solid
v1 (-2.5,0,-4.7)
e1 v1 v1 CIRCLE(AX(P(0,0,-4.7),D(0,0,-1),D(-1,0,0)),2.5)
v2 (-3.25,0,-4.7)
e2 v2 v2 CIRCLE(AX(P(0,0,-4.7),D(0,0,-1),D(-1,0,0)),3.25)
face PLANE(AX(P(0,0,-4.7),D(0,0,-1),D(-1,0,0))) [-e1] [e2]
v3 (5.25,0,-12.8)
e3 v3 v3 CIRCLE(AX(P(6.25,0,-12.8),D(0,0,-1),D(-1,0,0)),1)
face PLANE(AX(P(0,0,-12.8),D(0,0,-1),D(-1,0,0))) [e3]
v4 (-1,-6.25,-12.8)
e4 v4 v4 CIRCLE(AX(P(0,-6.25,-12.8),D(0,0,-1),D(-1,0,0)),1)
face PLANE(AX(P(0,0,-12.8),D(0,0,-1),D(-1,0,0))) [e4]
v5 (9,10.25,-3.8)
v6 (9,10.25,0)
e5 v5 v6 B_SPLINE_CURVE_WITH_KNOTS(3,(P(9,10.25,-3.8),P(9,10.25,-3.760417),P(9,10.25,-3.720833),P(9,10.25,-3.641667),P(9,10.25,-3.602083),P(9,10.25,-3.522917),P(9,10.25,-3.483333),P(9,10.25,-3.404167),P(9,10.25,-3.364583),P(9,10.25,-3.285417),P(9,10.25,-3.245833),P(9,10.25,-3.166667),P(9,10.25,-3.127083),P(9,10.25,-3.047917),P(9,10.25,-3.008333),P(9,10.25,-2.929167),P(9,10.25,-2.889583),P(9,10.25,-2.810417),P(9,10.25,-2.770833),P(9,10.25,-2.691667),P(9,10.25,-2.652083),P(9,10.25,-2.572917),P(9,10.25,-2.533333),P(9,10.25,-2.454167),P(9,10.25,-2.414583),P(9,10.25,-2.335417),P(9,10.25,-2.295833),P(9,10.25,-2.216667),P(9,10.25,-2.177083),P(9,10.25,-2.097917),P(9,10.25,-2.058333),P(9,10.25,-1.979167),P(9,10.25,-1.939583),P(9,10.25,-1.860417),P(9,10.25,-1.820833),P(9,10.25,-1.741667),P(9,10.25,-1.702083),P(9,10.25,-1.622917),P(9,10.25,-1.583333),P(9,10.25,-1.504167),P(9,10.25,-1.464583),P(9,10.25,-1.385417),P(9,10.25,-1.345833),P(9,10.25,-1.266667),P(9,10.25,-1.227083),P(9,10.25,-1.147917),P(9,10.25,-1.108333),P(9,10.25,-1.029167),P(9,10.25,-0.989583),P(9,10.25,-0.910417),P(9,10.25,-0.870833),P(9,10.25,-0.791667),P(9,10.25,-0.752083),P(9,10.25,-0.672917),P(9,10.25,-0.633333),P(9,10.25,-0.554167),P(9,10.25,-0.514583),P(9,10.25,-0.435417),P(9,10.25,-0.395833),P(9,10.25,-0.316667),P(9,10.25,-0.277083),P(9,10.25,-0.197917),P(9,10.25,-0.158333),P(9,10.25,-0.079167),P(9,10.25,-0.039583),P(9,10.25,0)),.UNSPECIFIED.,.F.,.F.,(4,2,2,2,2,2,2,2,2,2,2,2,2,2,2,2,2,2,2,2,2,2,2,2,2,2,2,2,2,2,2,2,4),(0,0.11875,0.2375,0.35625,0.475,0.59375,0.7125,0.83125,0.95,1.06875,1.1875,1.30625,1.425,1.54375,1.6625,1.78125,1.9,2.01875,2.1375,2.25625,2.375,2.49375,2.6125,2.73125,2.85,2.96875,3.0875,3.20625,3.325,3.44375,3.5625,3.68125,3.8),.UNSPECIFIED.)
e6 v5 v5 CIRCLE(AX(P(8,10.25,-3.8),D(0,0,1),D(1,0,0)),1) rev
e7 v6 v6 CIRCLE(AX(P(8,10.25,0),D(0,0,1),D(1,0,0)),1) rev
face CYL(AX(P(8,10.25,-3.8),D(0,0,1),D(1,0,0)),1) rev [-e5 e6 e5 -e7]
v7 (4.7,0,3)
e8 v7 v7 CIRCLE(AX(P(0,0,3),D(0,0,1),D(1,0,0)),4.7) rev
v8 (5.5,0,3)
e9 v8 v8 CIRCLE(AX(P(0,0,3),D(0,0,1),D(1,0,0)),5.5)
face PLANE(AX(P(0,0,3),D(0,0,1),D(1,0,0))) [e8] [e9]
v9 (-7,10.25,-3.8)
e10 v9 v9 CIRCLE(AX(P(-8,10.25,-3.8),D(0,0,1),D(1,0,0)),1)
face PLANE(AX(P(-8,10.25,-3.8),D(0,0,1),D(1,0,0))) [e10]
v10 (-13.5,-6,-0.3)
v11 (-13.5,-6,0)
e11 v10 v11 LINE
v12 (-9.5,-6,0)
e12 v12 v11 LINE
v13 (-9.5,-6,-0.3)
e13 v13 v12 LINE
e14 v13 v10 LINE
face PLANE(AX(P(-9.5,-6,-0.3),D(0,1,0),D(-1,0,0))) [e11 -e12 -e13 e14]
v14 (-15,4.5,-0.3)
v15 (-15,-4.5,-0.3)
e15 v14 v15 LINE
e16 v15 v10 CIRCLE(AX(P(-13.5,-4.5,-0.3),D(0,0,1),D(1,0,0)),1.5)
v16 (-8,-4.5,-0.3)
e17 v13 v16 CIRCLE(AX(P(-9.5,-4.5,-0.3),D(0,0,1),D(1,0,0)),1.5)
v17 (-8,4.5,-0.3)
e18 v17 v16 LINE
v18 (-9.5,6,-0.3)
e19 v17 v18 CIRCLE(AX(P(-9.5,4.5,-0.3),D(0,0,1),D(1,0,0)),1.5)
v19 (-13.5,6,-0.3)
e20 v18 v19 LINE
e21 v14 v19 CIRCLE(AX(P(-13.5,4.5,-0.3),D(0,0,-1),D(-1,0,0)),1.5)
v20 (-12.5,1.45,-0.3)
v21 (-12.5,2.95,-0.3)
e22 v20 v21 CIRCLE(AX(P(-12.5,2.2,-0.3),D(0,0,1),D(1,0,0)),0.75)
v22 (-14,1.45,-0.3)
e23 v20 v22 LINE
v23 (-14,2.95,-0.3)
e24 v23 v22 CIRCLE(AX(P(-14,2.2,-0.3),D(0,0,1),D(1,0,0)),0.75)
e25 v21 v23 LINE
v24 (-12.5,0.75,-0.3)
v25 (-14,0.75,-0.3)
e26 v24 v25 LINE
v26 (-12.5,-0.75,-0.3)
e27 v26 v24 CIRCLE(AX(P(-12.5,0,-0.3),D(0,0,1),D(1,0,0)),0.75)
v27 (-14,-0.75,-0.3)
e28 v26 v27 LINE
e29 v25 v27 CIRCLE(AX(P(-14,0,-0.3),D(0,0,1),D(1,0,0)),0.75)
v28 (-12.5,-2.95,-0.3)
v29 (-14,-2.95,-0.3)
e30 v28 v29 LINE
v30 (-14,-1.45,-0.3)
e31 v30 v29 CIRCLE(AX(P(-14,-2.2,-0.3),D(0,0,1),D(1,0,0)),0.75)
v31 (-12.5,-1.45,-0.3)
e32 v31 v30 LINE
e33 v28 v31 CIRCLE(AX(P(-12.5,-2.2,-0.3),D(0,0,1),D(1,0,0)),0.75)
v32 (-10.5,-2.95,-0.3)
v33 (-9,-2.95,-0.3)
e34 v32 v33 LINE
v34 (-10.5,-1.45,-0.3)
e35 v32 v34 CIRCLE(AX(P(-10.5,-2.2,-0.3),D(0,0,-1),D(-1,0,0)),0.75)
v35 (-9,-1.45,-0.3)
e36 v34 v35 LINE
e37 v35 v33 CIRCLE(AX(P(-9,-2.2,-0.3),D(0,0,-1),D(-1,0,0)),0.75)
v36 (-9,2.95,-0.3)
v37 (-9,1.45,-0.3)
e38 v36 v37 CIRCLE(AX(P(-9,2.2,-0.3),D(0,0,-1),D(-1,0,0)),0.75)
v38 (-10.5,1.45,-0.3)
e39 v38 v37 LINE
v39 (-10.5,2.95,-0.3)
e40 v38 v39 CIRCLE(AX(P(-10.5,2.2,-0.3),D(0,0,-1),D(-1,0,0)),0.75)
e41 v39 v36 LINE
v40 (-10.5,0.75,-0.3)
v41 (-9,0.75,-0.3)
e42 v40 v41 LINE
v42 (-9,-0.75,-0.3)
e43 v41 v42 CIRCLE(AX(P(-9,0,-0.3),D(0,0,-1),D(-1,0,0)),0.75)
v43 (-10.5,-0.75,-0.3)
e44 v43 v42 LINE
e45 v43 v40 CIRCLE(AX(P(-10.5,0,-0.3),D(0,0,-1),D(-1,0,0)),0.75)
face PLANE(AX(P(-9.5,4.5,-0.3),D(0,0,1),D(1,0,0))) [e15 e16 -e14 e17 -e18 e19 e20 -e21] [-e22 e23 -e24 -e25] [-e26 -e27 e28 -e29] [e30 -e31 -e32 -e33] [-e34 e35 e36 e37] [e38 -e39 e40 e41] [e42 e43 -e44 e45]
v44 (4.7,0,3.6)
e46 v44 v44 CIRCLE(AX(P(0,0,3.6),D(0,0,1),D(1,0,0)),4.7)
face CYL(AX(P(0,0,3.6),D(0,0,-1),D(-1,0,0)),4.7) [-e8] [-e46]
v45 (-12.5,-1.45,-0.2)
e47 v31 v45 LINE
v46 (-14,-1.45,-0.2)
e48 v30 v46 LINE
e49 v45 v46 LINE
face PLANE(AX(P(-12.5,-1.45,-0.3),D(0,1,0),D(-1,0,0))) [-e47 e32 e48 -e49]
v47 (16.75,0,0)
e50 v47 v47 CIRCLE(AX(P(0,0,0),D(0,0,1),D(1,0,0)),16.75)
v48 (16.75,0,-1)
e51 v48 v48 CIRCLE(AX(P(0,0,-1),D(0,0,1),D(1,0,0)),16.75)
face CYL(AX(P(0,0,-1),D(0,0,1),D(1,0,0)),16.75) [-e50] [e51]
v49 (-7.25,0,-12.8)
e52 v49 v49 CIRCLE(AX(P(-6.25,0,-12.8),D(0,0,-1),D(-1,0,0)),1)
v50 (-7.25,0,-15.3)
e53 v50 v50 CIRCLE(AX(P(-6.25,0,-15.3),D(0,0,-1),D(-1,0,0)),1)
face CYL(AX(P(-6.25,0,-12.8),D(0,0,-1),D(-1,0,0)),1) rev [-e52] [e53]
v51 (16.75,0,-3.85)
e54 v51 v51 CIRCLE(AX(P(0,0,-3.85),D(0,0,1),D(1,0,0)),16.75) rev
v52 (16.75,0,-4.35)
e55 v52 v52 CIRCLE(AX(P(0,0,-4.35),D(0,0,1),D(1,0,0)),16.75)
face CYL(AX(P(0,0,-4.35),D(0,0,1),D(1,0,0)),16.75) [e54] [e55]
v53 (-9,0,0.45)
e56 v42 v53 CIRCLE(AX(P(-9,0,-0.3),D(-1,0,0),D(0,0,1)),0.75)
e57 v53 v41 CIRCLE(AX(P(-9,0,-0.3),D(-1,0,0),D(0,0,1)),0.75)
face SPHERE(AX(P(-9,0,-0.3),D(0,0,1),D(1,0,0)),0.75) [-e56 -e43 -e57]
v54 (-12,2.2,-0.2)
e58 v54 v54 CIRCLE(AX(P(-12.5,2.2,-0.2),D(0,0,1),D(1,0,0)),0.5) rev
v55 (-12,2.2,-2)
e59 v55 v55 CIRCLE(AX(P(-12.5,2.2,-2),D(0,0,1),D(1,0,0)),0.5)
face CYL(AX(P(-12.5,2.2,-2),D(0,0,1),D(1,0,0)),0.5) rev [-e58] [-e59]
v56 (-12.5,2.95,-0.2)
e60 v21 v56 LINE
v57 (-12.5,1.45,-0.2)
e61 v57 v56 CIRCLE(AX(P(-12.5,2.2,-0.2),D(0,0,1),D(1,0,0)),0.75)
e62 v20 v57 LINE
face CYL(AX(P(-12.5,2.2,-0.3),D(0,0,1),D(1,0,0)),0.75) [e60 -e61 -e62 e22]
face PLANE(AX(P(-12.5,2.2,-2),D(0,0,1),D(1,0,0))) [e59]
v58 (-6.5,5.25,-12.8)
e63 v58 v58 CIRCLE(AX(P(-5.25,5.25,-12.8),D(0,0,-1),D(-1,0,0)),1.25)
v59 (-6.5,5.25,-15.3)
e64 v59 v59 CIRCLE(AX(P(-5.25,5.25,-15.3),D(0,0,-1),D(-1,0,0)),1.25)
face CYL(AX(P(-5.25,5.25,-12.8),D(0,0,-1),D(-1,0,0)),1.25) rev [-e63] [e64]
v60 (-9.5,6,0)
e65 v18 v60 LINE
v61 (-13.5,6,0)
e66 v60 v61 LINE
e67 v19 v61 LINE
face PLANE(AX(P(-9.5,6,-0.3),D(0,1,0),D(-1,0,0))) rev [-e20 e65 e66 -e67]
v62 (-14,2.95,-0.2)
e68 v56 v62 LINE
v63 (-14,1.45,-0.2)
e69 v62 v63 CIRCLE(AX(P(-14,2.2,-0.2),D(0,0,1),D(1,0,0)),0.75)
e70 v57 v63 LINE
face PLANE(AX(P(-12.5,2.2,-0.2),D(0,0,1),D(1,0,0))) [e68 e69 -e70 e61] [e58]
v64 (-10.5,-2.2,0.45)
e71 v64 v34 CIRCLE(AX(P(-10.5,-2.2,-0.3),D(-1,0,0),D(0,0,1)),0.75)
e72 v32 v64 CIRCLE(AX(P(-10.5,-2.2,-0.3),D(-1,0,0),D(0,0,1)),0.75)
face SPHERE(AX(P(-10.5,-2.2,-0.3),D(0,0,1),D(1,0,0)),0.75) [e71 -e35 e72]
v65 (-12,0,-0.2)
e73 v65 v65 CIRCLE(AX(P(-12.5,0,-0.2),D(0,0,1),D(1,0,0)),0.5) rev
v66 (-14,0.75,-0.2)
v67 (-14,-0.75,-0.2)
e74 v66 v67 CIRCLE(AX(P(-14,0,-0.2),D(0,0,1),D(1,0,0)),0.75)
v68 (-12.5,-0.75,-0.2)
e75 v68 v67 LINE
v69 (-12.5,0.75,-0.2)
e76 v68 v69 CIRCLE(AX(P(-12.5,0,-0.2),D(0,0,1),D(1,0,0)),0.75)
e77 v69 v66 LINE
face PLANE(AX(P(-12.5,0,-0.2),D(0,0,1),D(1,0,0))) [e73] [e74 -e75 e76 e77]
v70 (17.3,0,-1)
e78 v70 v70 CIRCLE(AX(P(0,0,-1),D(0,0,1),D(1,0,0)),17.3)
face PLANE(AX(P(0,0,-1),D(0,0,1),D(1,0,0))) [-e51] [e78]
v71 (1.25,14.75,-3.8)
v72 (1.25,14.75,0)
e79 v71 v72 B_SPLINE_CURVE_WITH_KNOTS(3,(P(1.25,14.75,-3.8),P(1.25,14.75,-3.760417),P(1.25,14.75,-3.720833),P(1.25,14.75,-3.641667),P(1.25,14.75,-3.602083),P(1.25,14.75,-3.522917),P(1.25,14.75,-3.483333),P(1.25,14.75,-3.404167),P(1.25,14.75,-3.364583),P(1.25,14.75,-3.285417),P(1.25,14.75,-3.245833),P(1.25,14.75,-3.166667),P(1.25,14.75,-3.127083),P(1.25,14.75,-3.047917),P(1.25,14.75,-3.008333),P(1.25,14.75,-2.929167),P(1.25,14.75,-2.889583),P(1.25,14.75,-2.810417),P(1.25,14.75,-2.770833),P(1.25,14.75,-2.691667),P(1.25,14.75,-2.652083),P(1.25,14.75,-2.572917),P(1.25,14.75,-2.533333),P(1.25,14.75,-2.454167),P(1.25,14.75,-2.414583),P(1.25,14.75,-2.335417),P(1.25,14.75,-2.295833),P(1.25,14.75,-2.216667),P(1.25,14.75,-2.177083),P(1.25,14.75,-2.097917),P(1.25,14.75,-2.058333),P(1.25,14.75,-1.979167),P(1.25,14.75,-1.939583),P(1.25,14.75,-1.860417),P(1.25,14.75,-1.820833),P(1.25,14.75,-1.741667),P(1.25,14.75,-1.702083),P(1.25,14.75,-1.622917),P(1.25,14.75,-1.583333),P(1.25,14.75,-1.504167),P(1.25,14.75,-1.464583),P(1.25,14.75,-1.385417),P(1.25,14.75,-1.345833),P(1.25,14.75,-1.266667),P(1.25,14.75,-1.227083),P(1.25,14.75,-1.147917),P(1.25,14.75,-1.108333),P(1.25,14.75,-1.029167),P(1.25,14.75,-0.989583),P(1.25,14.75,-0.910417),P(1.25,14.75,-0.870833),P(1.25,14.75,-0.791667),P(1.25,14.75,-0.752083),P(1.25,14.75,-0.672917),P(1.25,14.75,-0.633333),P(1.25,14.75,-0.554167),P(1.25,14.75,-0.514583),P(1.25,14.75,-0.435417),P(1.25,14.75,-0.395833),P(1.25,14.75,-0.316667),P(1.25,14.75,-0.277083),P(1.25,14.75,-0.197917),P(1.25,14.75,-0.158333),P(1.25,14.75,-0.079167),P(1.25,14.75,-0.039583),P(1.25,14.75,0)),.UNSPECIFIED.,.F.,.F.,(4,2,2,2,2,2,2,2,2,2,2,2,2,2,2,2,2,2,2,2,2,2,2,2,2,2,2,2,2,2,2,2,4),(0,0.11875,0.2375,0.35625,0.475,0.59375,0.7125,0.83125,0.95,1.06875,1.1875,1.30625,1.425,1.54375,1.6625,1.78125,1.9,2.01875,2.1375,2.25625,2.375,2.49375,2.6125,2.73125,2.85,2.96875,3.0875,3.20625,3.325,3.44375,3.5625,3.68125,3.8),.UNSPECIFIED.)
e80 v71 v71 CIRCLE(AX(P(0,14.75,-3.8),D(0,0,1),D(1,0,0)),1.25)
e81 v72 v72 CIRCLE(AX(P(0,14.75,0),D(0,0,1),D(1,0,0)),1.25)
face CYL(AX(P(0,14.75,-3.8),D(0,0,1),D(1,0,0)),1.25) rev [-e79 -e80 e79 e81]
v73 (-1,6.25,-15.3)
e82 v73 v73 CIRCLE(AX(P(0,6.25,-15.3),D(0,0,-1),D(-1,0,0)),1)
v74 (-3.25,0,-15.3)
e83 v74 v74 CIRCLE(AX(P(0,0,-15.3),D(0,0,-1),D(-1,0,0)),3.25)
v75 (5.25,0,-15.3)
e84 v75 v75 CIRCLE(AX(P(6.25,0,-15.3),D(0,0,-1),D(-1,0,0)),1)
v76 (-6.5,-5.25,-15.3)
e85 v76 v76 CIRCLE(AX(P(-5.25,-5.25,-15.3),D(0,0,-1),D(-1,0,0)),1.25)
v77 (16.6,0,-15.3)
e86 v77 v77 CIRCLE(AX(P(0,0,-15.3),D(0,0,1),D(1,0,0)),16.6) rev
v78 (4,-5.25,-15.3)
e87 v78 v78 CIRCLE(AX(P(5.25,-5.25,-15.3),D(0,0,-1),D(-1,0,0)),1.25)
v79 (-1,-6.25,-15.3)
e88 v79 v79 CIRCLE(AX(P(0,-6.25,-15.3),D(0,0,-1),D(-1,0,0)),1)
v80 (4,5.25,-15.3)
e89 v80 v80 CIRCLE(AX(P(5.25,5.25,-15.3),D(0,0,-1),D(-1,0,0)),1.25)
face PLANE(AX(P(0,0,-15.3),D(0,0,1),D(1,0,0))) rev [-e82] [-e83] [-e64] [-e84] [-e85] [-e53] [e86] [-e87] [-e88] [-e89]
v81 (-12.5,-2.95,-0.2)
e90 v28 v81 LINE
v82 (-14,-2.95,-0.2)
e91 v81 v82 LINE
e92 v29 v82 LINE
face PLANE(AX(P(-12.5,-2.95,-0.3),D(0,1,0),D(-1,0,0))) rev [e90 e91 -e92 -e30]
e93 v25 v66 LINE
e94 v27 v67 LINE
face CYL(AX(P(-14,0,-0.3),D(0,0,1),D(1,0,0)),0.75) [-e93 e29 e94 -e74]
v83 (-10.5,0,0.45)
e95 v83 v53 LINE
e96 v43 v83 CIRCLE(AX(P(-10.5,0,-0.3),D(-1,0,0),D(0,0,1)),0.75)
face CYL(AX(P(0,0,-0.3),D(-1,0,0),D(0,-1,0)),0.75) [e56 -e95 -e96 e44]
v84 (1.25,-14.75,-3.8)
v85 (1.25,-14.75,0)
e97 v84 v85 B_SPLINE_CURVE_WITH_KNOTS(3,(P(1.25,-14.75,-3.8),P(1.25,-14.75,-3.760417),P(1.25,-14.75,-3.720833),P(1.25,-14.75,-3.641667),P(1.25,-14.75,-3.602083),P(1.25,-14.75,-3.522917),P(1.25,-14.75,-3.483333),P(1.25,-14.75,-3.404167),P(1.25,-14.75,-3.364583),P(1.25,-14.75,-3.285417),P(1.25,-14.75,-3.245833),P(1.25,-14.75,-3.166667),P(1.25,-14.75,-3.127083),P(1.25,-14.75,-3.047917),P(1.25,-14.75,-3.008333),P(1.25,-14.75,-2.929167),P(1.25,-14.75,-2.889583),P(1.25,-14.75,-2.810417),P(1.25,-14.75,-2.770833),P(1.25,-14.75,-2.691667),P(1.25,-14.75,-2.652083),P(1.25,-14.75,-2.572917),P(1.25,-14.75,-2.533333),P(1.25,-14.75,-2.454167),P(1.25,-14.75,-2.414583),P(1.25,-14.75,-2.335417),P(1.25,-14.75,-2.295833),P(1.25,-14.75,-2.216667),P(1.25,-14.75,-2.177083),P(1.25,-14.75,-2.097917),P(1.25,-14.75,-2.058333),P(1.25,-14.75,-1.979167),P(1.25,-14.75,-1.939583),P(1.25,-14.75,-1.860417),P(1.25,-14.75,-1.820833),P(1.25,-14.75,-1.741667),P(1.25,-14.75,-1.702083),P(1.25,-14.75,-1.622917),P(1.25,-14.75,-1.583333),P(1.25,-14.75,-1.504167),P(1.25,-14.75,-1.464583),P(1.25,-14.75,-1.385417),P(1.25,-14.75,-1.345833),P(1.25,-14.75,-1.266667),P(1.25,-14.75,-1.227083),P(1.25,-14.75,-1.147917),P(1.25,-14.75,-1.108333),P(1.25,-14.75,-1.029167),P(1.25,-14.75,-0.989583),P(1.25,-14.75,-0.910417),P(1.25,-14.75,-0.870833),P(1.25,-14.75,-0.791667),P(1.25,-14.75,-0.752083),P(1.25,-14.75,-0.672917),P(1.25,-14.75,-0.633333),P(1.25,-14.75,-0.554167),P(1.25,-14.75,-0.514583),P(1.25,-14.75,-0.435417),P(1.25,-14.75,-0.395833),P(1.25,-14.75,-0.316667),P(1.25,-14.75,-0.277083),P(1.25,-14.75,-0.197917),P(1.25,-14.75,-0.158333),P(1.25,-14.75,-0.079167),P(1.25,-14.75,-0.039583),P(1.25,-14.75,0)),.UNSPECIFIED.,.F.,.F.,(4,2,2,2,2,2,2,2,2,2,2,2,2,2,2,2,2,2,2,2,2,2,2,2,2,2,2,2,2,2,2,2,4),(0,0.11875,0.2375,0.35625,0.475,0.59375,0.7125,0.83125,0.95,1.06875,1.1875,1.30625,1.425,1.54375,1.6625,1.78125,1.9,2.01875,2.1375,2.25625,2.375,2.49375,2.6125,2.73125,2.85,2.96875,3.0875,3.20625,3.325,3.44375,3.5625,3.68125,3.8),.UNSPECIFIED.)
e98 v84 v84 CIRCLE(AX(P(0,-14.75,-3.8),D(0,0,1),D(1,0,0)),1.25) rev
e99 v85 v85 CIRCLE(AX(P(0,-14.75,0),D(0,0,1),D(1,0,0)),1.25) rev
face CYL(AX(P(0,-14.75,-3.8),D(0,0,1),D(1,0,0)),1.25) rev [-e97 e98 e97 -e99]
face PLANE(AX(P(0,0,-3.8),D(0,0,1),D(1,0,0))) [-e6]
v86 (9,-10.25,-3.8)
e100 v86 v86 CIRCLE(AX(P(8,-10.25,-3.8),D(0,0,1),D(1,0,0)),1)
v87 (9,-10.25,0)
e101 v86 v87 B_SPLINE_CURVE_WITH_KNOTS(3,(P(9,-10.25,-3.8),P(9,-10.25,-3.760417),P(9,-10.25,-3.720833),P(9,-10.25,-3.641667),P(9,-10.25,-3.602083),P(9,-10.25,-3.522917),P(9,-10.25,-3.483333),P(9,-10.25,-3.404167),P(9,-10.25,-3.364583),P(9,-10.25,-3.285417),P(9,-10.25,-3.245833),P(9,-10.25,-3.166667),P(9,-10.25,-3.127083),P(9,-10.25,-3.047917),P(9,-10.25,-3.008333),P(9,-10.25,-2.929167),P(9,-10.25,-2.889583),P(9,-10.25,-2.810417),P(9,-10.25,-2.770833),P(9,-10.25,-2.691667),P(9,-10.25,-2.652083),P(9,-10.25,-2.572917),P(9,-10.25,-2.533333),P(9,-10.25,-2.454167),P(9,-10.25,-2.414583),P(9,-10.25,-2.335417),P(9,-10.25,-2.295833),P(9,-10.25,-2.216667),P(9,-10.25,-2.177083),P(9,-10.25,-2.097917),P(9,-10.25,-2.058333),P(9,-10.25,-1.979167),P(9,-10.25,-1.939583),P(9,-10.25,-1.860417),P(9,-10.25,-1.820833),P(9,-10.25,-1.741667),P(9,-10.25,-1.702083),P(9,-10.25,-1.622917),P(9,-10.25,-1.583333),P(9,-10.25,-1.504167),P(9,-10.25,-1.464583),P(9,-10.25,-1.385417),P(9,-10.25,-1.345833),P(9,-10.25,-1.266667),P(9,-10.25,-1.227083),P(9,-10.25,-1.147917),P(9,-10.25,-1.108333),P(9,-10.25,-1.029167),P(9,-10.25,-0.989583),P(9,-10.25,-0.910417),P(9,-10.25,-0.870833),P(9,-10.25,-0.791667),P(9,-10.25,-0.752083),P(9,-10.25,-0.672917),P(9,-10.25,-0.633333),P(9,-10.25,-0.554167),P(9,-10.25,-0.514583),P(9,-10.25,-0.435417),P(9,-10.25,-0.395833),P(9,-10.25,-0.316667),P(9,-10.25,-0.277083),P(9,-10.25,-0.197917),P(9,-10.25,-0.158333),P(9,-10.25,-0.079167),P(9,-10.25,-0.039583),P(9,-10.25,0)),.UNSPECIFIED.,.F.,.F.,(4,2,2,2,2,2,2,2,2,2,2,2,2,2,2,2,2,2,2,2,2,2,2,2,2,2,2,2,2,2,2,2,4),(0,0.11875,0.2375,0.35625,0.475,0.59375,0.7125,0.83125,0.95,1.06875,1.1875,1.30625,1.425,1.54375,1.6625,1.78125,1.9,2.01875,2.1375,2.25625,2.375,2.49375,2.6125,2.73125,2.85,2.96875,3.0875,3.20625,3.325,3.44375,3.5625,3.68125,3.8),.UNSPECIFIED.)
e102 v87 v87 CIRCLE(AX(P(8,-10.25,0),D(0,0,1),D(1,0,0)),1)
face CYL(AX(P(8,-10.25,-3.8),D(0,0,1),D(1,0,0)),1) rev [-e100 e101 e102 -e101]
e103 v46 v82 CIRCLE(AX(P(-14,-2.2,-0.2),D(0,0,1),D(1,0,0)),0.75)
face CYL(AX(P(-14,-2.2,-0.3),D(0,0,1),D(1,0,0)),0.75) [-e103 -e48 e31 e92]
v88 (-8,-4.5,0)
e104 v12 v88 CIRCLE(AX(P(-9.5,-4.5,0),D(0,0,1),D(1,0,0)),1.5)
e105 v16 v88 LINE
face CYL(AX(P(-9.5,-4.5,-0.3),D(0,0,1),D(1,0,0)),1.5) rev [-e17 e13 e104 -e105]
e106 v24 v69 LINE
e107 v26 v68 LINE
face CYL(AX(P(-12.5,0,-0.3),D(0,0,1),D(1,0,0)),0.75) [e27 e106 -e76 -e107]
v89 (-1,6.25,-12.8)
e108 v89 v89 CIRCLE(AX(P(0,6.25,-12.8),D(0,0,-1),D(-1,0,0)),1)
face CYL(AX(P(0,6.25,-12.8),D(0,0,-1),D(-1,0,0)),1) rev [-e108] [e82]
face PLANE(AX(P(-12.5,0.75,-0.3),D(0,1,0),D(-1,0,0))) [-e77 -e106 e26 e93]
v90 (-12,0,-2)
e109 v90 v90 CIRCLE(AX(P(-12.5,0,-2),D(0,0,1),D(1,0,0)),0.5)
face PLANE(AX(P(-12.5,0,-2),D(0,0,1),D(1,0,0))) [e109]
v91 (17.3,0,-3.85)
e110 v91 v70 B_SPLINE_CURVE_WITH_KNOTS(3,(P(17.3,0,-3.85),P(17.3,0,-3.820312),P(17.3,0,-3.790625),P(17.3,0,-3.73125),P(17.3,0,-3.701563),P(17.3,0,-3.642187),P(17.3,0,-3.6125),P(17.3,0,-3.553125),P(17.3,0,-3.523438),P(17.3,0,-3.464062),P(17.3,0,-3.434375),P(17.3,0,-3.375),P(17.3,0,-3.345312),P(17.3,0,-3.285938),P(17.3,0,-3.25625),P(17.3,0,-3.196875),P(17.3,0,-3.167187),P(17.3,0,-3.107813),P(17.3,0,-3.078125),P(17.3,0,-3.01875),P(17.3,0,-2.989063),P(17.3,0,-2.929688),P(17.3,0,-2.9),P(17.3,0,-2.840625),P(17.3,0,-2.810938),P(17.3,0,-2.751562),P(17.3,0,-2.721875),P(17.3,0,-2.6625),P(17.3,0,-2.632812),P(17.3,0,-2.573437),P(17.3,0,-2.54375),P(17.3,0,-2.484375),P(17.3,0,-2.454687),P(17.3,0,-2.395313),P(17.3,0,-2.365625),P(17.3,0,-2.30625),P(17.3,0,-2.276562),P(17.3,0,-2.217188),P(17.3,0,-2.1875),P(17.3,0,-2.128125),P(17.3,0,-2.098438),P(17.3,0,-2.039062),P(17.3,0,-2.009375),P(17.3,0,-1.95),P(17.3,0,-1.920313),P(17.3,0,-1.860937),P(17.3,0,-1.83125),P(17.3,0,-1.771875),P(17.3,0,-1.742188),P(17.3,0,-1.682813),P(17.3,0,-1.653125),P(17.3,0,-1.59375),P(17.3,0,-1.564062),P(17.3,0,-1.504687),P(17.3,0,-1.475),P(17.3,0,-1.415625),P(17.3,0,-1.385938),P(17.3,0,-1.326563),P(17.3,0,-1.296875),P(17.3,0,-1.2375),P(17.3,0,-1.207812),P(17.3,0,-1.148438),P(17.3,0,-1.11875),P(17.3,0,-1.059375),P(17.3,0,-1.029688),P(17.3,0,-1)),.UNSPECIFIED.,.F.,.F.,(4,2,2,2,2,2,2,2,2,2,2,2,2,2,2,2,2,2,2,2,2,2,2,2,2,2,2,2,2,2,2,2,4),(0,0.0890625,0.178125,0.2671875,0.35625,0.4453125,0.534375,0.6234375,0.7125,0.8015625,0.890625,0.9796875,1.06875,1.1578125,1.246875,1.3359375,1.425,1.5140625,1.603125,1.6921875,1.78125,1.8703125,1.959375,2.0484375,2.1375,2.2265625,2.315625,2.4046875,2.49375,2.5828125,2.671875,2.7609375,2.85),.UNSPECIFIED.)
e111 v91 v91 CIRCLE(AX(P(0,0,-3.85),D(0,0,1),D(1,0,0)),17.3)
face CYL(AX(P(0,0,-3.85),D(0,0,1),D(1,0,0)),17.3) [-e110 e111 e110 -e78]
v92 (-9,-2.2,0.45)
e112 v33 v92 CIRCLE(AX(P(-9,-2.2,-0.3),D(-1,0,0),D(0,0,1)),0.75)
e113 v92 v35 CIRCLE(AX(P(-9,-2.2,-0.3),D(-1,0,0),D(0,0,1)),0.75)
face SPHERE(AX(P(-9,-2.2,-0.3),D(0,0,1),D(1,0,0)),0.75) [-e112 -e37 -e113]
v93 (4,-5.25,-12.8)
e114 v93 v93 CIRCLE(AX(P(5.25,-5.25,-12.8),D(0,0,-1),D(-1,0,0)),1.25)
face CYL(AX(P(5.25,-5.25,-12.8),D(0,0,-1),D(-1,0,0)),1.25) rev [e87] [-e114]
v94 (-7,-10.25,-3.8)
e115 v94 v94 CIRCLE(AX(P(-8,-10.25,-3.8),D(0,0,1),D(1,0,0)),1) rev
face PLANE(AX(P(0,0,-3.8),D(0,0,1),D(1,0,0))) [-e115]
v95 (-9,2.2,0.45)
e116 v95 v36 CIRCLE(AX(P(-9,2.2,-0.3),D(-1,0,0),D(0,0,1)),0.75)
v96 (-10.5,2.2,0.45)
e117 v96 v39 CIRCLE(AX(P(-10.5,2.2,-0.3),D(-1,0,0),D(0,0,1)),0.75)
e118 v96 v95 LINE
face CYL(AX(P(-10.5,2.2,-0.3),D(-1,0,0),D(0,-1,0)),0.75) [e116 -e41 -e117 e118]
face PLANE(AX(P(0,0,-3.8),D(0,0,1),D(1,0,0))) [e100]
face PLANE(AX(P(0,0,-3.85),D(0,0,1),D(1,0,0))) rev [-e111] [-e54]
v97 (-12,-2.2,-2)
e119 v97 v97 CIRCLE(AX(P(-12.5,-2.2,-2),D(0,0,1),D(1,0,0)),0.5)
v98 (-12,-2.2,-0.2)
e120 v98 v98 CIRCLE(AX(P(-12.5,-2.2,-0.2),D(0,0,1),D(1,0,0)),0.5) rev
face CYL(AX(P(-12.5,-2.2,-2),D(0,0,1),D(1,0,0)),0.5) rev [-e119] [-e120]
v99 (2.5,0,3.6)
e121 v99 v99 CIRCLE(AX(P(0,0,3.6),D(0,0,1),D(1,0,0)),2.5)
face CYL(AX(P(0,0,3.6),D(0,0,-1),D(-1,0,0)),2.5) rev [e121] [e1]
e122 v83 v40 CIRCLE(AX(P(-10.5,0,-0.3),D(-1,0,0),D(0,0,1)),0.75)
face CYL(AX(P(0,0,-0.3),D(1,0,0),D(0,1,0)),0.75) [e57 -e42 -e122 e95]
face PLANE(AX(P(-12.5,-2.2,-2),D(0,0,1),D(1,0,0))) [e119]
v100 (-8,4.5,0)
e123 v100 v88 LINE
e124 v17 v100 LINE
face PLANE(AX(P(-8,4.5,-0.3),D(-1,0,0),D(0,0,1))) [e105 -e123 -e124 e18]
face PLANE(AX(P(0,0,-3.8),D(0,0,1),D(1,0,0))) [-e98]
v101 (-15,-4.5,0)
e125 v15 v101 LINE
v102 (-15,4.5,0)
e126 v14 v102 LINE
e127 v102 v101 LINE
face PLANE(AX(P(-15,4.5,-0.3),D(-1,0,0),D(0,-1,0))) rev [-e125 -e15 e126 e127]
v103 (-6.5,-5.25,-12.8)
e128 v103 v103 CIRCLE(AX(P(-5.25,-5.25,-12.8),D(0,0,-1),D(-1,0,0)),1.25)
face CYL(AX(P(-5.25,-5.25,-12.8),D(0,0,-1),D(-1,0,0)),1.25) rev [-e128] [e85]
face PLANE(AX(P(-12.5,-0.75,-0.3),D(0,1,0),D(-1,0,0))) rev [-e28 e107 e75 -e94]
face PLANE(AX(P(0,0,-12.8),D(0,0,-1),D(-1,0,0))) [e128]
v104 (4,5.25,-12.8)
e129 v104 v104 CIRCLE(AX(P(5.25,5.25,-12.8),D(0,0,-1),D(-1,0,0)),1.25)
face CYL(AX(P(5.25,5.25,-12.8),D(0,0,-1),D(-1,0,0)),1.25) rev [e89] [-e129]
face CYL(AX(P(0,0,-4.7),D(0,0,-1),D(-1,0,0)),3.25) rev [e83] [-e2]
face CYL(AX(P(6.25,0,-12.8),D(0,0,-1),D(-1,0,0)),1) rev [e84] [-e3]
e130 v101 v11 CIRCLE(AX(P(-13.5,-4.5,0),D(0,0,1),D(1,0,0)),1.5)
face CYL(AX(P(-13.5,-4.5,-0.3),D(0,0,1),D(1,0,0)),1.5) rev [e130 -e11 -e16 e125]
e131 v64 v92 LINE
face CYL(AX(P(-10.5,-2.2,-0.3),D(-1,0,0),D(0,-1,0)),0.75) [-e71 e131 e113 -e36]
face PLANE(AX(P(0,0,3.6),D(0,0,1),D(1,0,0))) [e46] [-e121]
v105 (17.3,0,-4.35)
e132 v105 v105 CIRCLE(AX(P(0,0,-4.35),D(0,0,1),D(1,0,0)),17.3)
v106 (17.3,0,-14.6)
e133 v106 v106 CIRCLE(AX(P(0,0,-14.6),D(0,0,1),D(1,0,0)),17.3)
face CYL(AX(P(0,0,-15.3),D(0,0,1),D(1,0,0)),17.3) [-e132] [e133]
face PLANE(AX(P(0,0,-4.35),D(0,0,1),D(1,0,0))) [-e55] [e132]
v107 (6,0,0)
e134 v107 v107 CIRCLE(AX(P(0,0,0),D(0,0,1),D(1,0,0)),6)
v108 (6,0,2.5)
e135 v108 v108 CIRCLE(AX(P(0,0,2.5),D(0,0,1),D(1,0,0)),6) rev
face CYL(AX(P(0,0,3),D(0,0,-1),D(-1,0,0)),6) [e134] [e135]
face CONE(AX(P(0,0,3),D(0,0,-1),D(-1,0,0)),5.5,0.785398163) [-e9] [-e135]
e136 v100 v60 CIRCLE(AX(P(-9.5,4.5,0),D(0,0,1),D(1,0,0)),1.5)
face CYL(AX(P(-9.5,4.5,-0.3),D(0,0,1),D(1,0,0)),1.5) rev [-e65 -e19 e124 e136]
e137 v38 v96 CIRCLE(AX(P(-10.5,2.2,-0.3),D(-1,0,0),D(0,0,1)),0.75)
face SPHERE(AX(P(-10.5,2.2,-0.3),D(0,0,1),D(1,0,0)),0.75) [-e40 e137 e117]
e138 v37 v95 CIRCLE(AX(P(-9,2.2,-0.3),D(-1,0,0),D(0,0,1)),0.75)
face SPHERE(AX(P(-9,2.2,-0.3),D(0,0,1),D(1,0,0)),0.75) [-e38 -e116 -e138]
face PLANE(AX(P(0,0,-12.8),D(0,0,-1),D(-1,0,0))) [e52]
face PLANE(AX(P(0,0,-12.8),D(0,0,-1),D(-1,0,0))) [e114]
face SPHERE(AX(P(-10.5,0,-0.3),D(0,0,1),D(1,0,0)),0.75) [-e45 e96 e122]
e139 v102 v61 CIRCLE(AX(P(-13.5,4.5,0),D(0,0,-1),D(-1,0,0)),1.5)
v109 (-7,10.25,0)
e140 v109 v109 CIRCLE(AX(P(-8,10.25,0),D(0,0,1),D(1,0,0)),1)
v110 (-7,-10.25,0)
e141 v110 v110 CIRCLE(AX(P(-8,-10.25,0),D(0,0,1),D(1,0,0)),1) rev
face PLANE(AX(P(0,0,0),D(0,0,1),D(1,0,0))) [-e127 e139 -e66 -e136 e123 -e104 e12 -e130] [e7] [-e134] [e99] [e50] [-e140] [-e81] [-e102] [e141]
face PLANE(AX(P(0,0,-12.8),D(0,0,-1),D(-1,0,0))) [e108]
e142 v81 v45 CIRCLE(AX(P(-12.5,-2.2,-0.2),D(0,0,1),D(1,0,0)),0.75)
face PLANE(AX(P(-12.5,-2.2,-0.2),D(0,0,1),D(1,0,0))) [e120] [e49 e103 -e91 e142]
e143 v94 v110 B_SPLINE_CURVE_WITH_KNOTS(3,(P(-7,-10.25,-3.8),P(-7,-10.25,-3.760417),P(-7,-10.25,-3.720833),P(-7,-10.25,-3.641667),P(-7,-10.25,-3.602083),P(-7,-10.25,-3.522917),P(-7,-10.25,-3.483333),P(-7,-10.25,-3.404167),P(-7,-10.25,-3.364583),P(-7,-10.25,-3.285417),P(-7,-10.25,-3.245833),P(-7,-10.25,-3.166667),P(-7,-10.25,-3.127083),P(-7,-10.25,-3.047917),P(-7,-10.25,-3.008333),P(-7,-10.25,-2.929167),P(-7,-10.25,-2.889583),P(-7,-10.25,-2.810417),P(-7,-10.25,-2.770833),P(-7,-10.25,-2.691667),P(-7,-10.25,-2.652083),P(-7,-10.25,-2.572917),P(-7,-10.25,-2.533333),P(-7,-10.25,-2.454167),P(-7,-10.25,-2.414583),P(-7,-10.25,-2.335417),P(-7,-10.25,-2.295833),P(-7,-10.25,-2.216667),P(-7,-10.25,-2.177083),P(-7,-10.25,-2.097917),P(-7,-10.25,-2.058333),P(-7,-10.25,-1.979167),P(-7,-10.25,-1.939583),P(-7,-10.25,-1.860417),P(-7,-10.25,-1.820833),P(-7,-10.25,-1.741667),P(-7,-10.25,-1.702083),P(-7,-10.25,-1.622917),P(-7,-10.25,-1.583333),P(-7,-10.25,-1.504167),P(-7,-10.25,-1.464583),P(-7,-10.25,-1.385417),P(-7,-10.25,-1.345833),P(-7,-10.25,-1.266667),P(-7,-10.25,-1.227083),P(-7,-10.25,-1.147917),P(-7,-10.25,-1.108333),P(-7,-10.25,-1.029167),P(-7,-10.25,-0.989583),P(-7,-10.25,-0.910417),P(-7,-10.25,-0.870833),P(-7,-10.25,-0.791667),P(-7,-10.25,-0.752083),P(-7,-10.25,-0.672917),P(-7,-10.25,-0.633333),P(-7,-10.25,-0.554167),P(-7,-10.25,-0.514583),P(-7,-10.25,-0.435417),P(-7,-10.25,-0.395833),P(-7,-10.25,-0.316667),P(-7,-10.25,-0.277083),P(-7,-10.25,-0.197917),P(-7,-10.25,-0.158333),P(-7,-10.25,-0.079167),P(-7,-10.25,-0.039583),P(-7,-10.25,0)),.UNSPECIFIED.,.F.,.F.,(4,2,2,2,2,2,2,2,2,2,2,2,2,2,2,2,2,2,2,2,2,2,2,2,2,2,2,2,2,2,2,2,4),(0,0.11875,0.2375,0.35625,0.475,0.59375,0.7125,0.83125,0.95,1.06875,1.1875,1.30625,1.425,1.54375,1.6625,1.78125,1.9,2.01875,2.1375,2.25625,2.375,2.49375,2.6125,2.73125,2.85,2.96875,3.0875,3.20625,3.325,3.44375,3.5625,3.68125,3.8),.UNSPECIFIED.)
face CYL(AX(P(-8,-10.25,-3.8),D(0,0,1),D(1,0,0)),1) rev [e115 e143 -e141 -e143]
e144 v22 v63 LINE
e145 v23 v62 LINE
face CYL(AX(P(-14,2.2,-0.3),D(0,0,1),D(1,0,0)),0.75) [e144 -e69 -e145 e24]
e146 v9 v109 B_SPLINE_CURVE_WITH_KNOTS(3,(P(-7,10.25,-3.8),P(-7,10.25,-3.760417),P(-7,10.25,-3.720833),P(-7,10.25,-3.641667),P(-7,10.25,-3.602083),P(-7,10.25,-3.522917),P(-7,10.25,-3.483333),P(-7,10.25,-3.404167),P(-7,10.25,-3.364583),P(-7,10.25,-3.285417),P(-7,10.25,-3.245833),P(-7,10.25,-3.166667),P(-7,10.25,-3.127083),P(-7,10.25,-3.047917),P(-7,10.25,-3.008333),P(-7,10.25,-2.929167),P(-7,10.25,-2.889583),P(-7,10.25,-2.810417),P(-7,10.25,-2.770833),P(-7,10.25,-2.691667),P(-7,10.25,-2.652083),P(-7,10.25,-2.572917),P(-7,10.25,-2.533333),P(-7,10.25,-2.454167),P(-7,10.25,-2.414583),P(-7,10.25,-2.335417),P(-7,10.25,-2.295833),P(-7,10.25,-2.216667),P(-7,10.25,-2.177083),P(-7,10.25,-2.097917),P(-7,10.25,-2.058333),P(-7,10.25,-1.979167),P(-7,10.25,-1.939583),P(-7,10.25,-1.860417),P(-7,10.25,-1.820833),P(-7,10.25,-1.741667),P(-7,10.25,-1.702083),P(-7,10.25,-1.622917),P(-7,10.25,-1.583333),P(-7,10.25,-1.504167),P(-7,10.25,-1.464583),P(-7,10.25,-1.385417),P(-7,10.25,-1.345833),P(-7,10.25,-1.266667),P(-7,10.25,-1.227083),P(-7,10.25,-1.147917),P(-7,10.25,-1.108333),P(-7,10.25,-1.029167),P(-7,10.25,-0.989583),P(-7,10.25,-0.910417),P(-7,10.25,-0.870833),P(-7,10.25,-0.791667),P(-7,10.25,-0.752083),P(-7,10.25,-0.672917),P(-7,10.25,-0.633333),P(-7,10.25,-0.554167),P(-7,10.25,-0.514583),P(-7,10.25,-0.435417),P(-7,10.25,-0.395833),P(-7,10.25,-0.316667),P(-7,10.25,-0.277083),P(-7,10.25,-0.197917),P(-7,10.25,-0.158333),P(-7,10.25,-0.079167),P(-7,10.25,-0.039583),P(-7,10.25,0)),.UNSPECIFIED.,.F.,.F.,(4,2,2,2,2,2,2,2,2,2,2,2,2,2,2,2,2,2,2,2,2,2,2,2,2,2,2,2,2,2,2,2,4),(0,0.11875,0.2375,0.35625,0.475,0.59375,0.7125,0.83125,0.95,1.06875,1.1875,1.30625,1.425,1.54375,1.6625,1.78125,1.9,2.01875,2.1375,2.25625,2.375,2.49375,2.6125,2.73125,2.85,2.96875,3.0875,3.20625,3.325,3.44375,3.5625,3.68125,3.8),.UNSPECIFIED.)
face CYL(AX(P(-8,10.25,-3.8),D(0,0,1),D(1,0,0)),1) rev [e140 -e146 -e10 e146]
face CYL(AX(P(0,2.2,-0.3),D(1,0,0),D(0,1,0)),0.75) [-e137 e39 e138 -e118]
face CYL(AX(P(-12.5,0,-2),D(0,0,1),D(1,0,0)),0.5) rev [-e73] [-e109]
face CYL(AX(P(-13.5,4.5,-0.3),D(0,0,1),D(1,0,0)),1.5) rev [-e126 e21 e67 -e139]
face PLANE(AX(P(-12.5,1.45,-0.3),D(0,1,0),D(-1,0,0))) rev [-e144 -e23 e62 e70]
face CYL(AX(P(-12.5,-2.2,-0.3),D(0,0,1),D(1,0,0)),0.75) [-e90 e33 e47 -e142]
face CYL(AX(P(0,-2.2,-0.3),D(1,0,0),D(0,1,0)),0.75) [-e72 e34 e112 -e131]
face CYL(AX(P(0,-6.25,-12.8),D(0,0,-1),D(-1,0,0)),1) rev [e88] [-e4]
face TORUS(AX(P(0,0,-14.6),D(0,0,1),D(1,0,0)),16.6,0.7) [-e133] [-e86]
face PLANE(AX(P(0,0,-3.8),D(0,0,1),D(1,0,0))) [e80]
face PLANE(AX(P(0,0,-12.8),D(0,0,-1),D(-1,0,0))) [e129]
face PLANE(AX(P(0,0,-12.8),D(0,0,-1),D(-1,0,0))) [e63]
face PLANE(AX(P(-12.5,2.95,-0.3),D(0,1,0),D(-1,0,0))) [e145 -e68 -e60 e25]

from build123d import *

# Parameters (mm, degrees)
SKETCH_1_R           = 6
EXTRUDE_1_DEPTH      = 3
SKETCH_1_3_R         = 4.7
EXTRUDE_2_DEPTH      = 3.6
SKETCH_1_4_R         = 2.5
CUT_EXTRUDE_1_DEPTH  = 3.6
SKETCH_1_7_R         = 17.3
EXTRUDE_4_DEPTH      = 15.3
SKETCH_1_8_R         = 17.3
SKETCH_1_8_R_2       = 16.75
CUT_EXTRUDE_3_DEPTH  = 4.35
SKETCH_1_5_R         = 17.3
EXTRUDE_3_DEPTH      = 3.85
SKETCH_1_6_R         = 17.3
SKETCH_1_6_R_2       = 16.75
CUT_EXTRUDE_2_DEPTH  = 1
SKETCH_5_R           = 3.25
CUT_EXTRUDE_4_DEPTH  = 10.6
SKETCH_5_3_R         = 1.25
SKETCH_5_3_R_2       = 1
CUT_EXTRUDE_5_DEPTH  = 2.5
SKETCH_1_9_R         = 1.25
SKETCH_1_9_R_2       = 1
CUT_EXTRUDE_6_DEPTH  = 3.8
FILLET_1_R           = 0.7
CHAMFER_1_SIZE       = 0.5
CUT_EXTRUDE_START    = -10
SKETCH_1_10_R        = 2.5
CUT_EXTRUDE_7_DEPTH  = 10
CUT_EXTRUDE_8_DEPTH  = 0.3
EXTRUDE_5_DEPTH      = 0.45
EXTRUDE_5_2_DEPTH    = 0.45
EXTRUDE_5_3_DEPTH    = 0.45
EXTRUDE_6_DEPTH      = 0.3
FILLET_2_R           = 0.75
FILLET_3_R           = 0.75
FILLET_4_R           = 0.75
EXTRUDE_7_DEPTH      = 0.3
SKETCH_1_13_R        = 0.5
CUT_EXTRUDE_9_DEPTH  = 2
CUT_EXTRUDE_10_DEPTH = 0.2


with BuildPart() as part:
    # 草图1 → 凸台-拉伸1 (new body)
    with BuildSketch(Plane.XY):
        Circle(SKETCH_1_R)
    extrude(amount=EXTRUDE_1_DEPTH)

    # 草图1<3> → 凸台-拉伸2 (add)
    with BuildSketch(Plane.XY):
        Circle(SKETCH_1_3_R)
    extrude(amount=EXTRUDE_2_DEPTH)

    # 草图1<4> → 切除-拉伸1 (cut)
    with BuildSketch(Plane.XY):
        Circle(SKETCH_1_4_R)
    extrude(amount=CUT_EXTRUDE_1_DEPTH, mode=Mode.SUBTRACT)

    # 草图1<7> → 凸台-拉伸4 (add)
    with BuildSketch(Plane.XY):
        Circle(SKETCH_1_7_R)
    extrude(amount=-EXTRUDE_4_DEPTH)

    # 草图1<8> → 切除-拉伸3 (cut)
    with BuildSketch(Plane.XY):
        Circle(SKETCH_1_8_R)
        Circle(SKETCH_1_8_R_2, mode=Mode.SUBTRACT)
    extrude(amount=-CUT_EXTRUDE_3_DEPTH, mode=Mode.SUBTRACT)

    # 草图1<5> → 凸台-拉伸3 (add)
    with BuildSketch(Plane.XY):
        Circle(SKETCH_1_5_R)
    extrude(amount=-EXTRUDE_3_DEPTH)

    # 草图1<6> → 切除-拉伸2 (cut)
    with BuildSketch(Plane.XY):
        Circle(SKETCH_1_6_R)
        Circle(SKETCH_1_6_R_2, mode=Mode.SUBTRACT)
    extrude(amount=-CUT_EXTRUDE_2_DEPTH, mode=Mode.SUBTRACT)

    # 草图5 → 切除-拉伸4 (cut)
    with BuildSketch(Plane(origin=(0, 0, -15.3), x_dir=(-1, 0, 0), z_dir=(0, 0, -1))):
        Circle(SKETCH_5_R)
    extrude(amount=-CUT_EXTRUDE_4_DEPTH, mode=Mode.SUBTRACT)

    # 草图5<3> → 切除-拉伸5 (cut)
    with BuildSketch(Plane(origin=(0, 0, -15.3), x_dir=(-1, 0, 0), z_dir=(0, 0, -1))):
        with Locations((-5.25, 5.25)):
            Circle(SKETCH_5_3_R)
        with Locations((0, 6.25)):
            Circle(SKETCH_5_3_R_2)
        with Locations((5.25, 5.25)):
            Circle(SKETCH_5_3_R)
        with Locations((6.25, 0)):
            Circle(SKETCH_5_3_R_2)
        with Locations((5.25, -5.25)):
            Circle(SKETCH_5_3_R)
        with Locations((0, -6.25)):
            Circle(SKETCH_5_3_R_2)
        with Locations((-5.25, -5.25)):
            Circle(SKETCH_5_3_R)
        with Locations((-6.25, 0)):
            Circle(SKETCH_5_3_R_2)
    extrude(amount=-CUT_EXTRUDE_5_DEPTH, mode=Mode.SUBTRACT)

    # 草图1<9> → 切除-拉伸6 (cut)
    with BuildSketch(Plane.XY):
        with Locations((0, 14.75)):
            Circle(SKETCH_1_9_R)
        with Locations((8, 10.25)):
            Circle(SKETCH_1_9_R_2)
        with Locations((8, -10.25)):
            Circle(SKETCH_1_9_R_2)
        with Locations((0, -14.75)):
            Circle(SKETCH_1_9_R)
        with Locations((-8, -10.25)):
            Circle(SKETCH_1_9_R_2)
        with Locations((-8, 10.25)):
            Circle(SKETCH_1_9_R_2)
    extrude(amount=-CUT_EXTRUDE_6_DEPTH, mode=Mode.SUBTRACT)

    # 圆角1
    fillet_1_edges = [part.edges().sort_by_distance(p)[0] for p in [
        (-17.3, 0, -15.3),
    ]]
    fillet(fillet_1_edges, radius=FILLET_1_R)

    # 倒角1
    chamfer_1_edges = [part.edges().sort_by_distance(p)[0] for p in [
        (-6, 0, 3),
    ]]
    chamfer(chamfer_1_edges, length=CHAMFER_1_SIZE)

    # 草图1<10> → 切除-拉伸7 (cut)
    with BuildSketch(Plane.XY.offset(CUT_EXTRUDE_START)):
        with Locations(Location((0, 0, 0), (0, 0, 180))):
            Circle(SKETCH_1_10_R)
    extrude(amount=CUT_EXTRUDE_7_DEPTH, mode=Mode.SUBTRACT)

    # 草图1<11> → 切除-拉伸8 (cut)
    with BuildSketch(Plane.XY):
        with BuildLine():
            Line((-9.5, 6), (-13.5, 6))
            ThreePointArc((-13.5, 6), (-14.560660172, 5.560660172), (-15, 4.5))
            Line((-15, 4.5), (-15, -4.5))
            ThreePointArc((-15, -4.5), (-14.560660172, -5.560660172), (-13.5, -6))
            Line((-13.5, -6), (-9.5, -6))
            ThreePointArc((-9.5, -6), (-8.439339828, -5.560660172), (-8, -4.5))
            Line((-8, -4.5), (-8, 4.5))
            ThreePointArc((-8, 4.5), (-8.439339828, 5.560660172), (-9.5, 6))
        make_face()
    extrude(amount=-CUT_EXTRUDE_8_DEPTH, mode=Mode.SUBTRACT)



with BuildPart() as body_2:
    # 草图1<12> → 凸台-拉伸5 (new body)
    with BuildSketch(Plane.XY):
        with BuildLine():
            ThreePointArc((-9, 0.75), (-8.25, 0), (-9, -0.75))
            Line((-9, -0.75), (-10.5, -0.75))
            ThreePointArc((-10.5, -0.75), (-11.25, 0), (-10.5, 0.75))
            Line((-10.5, 0.75), (-9, 0.75))
        make_face()
    extrude(amount=EXTRUDE_5_DEPTH)


with BuildPart() as body_3:
    # 草图1<12> → Extrude 5 2 (new body)
    with BuildSketch(Plane.XY):
        with BuildLine():
            ThreePointArc((-9, -1.45), (-8.25, -2.2), (-9, -2.95))
            Line((-9, -2.95), (-10.5, -2.95))
            ThreePointArc((-10.5, -2.95), (-11.25, -2.2), (-10.5, -1.45))
            Line((-10.5, -1.45), (-9, -1.45))
        make_face()
    extrude(amount=EXTRUDE_5_2_DEPTH)


with BuildPart() as body_4:
    # 草图1<12> → Extrude 5 3 (new body)
    with BuildSketch(Plane.XY):
        with BuildLine():
            ThreePointArc((-9, 2.95), (-8.25, 2.2), (-9, 1.45))
            Line((-9, 1.45), (-10.5, 1.45))
            ThreePointArc((-10.5, 1.45), (-11.25, 2.2), (-10.5, 2.95))
            Line((-10.5, 2.95), (-9, 2.95))
        make_face()
    extrude(amount=EXTRUDE_5_3_DEPTH)


with BuildPart() as part_1:
    add(part.part)

    add(body_2.part)  # 凸台-拉伸6 merges body 2

    add(body_3.part)  # 凸台-拉伸6 merges body 3

    add(body_4.part)  # 凸台-拉伸6 merges body 4
    # 草图1<14> → 凸台-拉伸6 (add)
    with BuildSketch(Plane.XY):
        with BuildLine():
            Line((-10.5, -0.75), (-9, -0.75))
            ThreePointArc((-9, -0.75), (-8.25, 0), (-9, 0.75))
            Line((-9, 0.75), (-10.5, 0.75))
            ThreePointArc((-10.5, 0.75), (-11.25, 0), (-10.5, -0.75))
        make_face()
        with BuildLine():
            Line((-10.5, -2.95), (-9, -2.95))
            ThreePointArc((-9, -2.95), (-8.25, -2.2), (-9, -1.45))
            Line((-9, -1.45), (-10.5, -1.45))
            ThreePointArc((-10.5, -1.45), (-11.25, -2.2), (-10.5, -2.95))
        make_face()
        with BuildLine():
            Line((-10.5, 1.45), (-9, 1.45))
            ThreePointArc((-9, 1.45), (-8.25, 2.2), (-9, 2.95))
            Line((-9, 2.95), (-10.5, 2.95))
            ThreePointArc((-10.5, 2.95), (-11.25, 2.2), (-10.5, 1.45))
        make_face()
    extrude(amount=-EXTRUDE_6_DEPTH)

    # 圆角2
    fillet_2_edges = [part_1.edges().sort_by_distance(p)[0] for p in [
        (-11.25, 2.2, 0.45),
        (-9.75, 1.45, 0.45),
        (-8.25, 2.2, 0.45),
        (-9.75, 2.95, 0.45),
    ]]
    fillet(fillet_2_edges, radius=FILLET_2_R - 0.0001)  # a hair under: the kernel refuses the full size

    # 圆角3
    fillet_3_edges = [part_1.edges().sort_by_distance(p)[0] for p in [
        (-11.25, 0, 0.45),
        (-9.75, -0.75, 0.45),
        (-8.25, 0, 0.45),
        (-9.75, 0.75, 0.45),
    ]]
    fillet(fillet_3_edges, radius=FILLET_3_R - 0.0001)  # a hair under: the kernel refuses the full size

    # 圆角4
    fillet_4_edges = [part_1.edges().sort_by_distance(p)[0] for p in [
        (-11.25, -2.2, 0.45),
        (-9.75, -2.95, 0.45),
        (-8.25, -2.2, 0.45),
        (-9.75, -1.45, 0.45),
    ]]
    fillet(fillet_4_edges, radius=FILLET_4_R - 0.0001)  # a hair under: the kernel refuses the full size

    # 草图1<15> → 凸台-拉伸7 (add)
    with BuildSketch(Plane.XY):
        with BuildLine():
            Line((-12.5, -0.75), (-14, -0.75))
            ThreePointArc((-14, -0.75), (-14.75, 0), (-14, 0.75))
            Line((-14, 0.75), (-12.5, 0.75))
            ThreePointArc((-12.5, 0.75), (-11.75, 0), (-12.5, -0.75))
        make_face()
        with BuildLine():
            Line((-12.5, 1.45), (-14, 1.45))
            ThreePointArc((-14, 1.45), (-14.75, 2.2), (-14, 2.95))
            Line((-14, 2.95), (-12.5, 2.95))
            ThreePointArc((-12.5, 2.95), (-11.75, 2.2), (-12.5, 1.45))
        make_face()
        with BuildLine():
            Line((-12.5, -2.95), (-14, -2.95))
            ThreePointArc((-14, -2.95), (-14.75, -2.2), (-14, -1.45))
            Line((-14, -1.45), (-12.5, -1.45))
            ThreePointArc((-12.5, -1.45), (-11.75, -2.2), (-12.5, -2.95))
        make_face()
    extrude(amount=-EXTRUDE_7_DEPTH)

    # 草图1<13> → 切除-拉伸9 (cut)
    with BuildSketch(Plane.XY):
        with Locations((-12.5, 0)):
            Circle(SKETCH_1_13_R)
        with Locations((-12.5, 2.2)):
            Circle(SKETCH_1_13_R)
        with Locations((-12.5, -2.2)):
            Circle(SKETCH_1_13_R)
    extrude(amount=-CUT_EXTRUDE_9_DEPTH, mode=Mode.SUBTRACT)

    # 草图1<16> → 切除-拉伸10 (cut)
    with BuildSketch(Plane.XY):
        with BuildLine():
            Line((-12.5, -0.75), (-14, -0.75))
            ThreePointArc((-14, -0.75), (-14.75, 0), (-14, 0.75))
            Line((-14, 0.75), (-12.5, 0.75))
            ThreePointArc((-12.5, 0.75), (-11.75, 0), (-12.5, -0.75))
        make_face()
        with BuildLine():
            Line((-12.5, 1.45), (-14, 1.45))
            ThreePointArc((-14, 1.45), (-14.75, 2.2), (-14, 2.95))
            Line((-14, 2.95), (-12.5, 2.95))
            ThreePointArc((-12.5, 2.95), (-11.75, 2.2), (-12.5, 1.45))
        make_face()
        with BuildLine():
            Line((-12.5, -2.95), (-14, -2.95))
            ThreePointArc((-14, -2.95), (-14.75, -2.2), (-14, -1.45))
            Line((-14, -1.45), (-12.5, -1.45))
            ThreePointArc((-12.5, -1.45), (-11.75, -2.2), (-12.5, -2.95))
        make_face()
    extrude(amount=-CUT_EXTRUDE_10_DEPTH, mode=Mode.SUBTRACT)


solid = part_1.part
